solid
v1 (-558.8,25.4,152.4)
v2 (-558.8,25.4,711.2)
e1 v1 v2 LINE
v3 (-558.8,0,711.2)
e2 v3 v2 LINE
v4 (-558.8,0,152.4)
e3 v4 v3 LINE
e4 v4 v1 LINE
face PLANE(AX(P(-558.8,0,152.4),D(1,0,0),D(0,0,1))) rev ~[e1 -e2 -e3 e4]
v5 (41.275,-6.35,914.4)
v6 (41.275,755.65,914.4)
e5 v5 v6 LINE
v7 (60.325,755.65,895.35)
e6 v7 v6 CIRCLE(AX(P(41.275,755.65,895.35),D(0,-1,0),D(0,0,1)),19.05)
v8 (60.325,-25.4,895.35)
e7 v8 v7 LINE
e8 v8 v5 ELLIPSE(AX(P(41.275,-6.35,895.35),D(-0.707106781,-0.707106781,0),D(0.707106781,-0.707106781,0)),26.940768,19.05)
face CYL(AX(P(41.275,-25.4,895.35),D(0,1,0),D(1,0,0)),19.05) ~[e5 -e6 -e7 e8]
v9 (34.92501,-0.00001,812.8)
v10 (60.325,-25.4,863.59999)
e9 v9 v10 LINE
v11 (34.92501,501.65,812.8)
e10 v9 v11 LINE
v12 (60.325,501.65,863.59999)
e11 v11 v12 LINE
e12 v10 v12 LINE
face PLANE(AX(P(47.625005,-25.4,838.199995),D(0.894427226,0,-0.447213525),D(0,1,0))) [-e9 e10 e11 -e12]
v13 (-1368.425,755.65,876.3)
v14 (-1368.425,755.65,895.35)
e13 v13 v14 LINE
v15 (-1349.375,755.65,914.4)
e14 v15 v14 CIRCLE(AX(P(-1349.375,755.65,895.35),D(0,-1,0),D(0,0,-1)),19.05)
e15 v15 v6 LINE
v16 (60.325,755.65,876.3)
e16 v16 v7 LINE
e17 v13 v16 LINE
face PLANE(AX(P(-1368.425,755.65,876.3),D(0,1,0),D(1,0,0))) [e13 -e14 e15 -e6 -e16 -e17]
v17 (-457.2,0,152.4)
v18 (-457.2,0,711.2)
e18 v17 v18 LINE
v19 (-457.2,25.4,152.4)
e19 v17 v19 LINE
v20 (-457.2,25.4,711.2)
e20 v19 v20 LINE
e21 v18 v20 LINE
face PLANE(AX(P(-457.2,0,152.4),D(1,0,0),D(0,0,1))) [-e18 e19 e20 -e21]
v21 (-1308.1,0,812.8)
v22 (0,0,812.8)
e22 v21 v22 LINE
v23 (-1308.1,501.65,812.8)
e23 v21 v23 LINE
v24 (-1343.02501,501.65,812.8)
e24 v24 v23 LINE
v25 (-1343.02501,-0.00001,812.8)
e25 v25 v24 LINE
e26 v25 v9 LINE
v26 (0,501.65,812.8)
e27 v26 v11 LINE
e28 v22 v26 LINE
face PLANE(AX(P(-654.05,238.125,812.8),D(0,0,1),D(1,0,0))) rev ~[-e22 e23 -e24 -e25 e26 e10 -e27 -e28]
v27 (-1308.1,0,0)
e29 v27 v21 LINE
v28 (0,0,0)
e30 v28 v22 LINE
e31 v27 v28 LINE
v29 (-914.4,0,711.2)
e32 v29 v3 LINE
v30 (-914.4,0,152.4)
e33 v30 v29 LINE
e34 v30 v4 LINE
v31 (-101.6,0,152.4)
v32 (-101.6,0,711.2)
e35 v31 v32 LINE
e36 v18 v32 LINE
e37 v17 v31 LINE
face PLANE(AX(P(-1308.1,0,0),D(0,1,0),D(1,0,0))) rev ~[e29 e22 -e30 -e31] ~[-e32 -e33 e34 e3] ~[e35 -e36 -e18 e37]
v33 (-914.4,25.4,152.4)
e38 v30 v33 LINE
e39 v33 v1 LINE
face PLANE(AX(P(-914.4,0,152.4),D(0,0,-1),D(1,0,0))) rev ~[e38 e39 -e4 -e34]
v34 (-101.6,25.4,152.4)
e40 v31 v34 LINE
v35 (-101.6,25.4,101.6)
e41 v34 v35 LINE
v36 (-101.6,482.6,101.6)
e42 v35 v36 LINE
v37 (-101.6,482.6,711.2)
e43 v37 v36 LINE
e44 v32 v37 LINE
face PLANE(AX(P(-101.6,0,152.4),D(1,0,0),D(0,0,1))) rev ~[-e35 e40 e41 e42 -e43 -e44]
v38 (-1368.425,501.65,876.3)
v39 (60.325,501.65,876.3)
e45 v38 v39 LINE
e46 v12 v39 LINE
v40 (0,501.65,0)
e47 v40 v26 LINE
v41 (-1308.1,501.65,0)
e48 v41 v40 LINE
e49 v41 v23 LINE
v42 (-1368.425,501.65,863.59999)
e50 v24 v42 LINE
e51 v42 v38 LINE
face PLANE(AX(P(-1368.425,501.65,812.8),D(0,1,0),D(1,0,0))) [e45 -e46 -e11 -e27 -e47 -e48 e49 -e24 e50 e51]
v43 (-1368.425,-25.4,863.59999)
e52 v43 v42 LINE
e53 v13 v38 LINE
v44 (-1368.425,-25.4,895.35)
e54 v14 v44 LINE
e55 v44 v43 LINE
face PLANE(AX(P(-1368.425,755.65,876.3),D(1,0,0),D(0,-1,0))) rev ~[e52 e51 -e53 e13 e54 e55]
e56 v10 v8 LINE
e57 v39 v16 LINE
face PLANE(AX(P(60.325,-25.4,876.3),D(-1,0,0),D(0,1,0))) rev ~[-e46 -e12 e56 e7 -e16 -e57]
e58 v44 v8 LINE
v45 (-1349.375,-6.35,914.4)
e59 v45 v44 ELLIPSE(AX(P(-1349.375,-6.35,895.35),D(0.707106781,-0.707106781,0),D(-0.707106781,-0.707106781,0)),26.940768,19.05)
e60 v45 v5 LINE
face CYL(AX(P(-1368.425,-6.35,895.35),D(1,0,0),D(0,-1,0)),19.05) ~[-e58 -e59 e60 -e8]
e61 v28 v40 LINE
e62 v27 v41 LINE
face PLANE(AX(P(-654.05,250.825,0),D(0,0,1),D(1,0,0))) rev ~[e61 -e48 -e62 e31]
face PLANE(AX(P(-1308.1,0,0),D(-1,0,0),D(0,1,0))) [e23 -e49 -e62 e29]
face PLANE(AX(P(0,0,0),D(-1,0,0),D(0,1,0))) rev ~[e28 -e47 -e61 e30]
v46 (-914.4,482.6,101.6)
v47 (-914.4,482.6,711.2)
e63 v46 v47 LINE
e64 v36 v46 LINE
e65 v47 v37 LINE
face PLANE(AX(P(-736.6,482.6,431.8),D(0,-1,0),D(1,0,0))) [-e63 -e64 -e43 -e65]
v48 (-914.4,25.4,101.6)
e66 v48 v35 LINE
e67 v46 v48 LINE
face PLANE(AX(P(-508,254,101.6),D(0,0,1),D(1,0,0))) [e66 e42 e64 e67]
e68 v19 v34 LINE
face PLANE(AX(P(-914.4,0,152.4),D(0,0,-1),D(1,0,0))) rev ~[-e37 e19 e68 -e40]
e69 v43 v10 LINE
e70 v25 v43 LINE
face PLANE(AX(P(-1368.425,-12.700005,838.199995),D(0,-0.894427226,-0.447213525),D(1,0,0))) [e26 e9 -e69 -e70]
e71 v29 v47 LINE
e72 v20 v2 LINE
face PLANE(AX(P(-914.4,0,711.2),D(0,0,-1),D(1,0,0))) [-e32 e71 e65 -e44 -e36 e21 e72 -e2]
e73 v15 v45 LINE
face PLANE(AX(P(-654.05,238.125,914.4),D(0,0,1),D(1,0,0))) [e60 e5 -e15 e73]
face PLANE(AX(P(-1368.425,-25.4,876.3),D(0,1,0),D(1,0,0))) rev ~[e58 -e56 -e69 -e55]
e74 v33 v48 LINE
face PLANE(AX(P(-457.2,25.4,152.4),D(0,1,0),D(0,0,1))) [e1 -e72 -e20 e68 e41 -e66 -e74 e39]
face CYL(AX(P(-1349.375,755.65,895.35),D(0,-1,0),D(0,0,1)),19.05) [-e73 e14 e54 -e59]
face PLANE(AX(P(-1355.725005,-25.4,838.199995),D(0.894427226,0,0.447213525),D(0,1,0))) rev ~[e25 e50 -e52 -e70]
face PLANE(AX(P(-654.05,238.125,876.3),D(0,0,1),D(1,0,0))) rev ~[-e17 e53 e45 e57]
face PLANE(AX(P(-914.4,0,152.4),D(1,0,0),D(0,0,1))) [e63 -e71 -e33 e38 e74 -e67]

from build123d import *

# Parameters (mm, degrees)
F0_W      = 1308.1
F0_H      = 501.65
F1_DEPTH  = 812.8
F2_W      = 1428.75
F2_H      = 527.05
F3_DEPTH  = 63.5
F4_SIZE2  = 50.79999
F4_SIZE   = 25.39999
F5_W      = 1428.75
F5_H      = 527.05
F5_H_2    = 254
F6_DEPTH  = 38.1
F7_R      = 19.05
F8_W      = 355.6
F8_H      = 558.8
F9_DEPTH  = 482.6
F10_W     = 457.2
F10_H     = 558.8
F11_DEPTH = 152.4
F13_DEPTH = 50.8


# Not quite as in the source:
# - a fillet or chamfer is up to 0.001 mm smaller than in the source, because OpenCascade refuses the exact size


with BuildPart() as f1:
    # F0 (on Top) → F1 (new body)
    with BuildSketch(Plane.XY):
        with Locations((-654.05, 250.825)):
            Rectangle(F0_W, F0_H)
    extrude(amount=F1_DEPTH)

    # F2 (on face) → F3 (join)
    with BuildSketch(Plane.XY.offset(812.8)):
        with Locations((-654.05, 238.125)):
            Rectangle(F2_W, F2_H)
    extrude(amount=F3_DEPTH)

    # F4 (size 25.4 and 50.8 in the source; OpenCascade refuses exactly that, so slightly less here)
    f4_edges = [f1.edges().sort_by_distance(p)[0] for p in [
        (-1368.425, 238.125, 812.8),
        (-654.05, -25.4, 812.8),
        (60.325, 238.125, 812.8),
    ]]
    f4_side = f1.faces().sort_by_distance((-654.05, -10.171381, 812.8))[0]
    chamfer(f4_edges, length=F4_SIZE, length2=F4_SIZE2, reference=f4_side)

    # F5 (on face) → F6 (join)
    with BuildSketch(Plane.XY.offset(876.3)):
        with Locations((-654.05, 238.125)):
            Rectangle(F5_W, F5_H)
        with Locations((-654.05, 628.65)):
            Rectangle(F5_W, F5_H_2)
    extrude(amount=F6_DEPTH)

    # F7
    f7_edges = [f1.edges().sort_by_distance(p)[0] for p in [
        (-1368.425, 365.125, 914.4),
        (-654.05, -25.4, 914.4),
        (60.325, 365.125, 914.4),
    ]]
    fillet(f7_edges, radius=F7_R)

    # F8 (on face) → F9 (cut)
    with BuildSketch(Plane.XZ):
        with Locations((-279.4, 431.8)):
            Rectangle(F8_W, F8_H)
        with Locations((-736.6, 431.8)):
            Rectangle(F8_W, F8_H)
    extrude(amount=-F9_DEPTH, mode=Mode.SUBTRACT)

    # F10 (on face) → F11 (cut)
    with BuildSketch(Plane.YZ.offset(-457.2)):
        with Locations((254, 431.8)):
            Rectangle(F10_W, F10_H)
    extrude(amount=-F11_DEPTH, mode=Mode.SUBTRACT)

    # F12 (on face) → F13 (cut)
    with BuildSketch(Plane.XY.offset(152.4)):
        Polygon((-101.6, 482.6), (-914.4, 482.6), (-914.4, 25.4), (-558.8, 25.4), (-457.2, 25.4), (-101.6, 25.4), align=None)
    extrude(amount=-F13_DEPTH, mode=Mode.SUBTRACT)


solid = f1.part
